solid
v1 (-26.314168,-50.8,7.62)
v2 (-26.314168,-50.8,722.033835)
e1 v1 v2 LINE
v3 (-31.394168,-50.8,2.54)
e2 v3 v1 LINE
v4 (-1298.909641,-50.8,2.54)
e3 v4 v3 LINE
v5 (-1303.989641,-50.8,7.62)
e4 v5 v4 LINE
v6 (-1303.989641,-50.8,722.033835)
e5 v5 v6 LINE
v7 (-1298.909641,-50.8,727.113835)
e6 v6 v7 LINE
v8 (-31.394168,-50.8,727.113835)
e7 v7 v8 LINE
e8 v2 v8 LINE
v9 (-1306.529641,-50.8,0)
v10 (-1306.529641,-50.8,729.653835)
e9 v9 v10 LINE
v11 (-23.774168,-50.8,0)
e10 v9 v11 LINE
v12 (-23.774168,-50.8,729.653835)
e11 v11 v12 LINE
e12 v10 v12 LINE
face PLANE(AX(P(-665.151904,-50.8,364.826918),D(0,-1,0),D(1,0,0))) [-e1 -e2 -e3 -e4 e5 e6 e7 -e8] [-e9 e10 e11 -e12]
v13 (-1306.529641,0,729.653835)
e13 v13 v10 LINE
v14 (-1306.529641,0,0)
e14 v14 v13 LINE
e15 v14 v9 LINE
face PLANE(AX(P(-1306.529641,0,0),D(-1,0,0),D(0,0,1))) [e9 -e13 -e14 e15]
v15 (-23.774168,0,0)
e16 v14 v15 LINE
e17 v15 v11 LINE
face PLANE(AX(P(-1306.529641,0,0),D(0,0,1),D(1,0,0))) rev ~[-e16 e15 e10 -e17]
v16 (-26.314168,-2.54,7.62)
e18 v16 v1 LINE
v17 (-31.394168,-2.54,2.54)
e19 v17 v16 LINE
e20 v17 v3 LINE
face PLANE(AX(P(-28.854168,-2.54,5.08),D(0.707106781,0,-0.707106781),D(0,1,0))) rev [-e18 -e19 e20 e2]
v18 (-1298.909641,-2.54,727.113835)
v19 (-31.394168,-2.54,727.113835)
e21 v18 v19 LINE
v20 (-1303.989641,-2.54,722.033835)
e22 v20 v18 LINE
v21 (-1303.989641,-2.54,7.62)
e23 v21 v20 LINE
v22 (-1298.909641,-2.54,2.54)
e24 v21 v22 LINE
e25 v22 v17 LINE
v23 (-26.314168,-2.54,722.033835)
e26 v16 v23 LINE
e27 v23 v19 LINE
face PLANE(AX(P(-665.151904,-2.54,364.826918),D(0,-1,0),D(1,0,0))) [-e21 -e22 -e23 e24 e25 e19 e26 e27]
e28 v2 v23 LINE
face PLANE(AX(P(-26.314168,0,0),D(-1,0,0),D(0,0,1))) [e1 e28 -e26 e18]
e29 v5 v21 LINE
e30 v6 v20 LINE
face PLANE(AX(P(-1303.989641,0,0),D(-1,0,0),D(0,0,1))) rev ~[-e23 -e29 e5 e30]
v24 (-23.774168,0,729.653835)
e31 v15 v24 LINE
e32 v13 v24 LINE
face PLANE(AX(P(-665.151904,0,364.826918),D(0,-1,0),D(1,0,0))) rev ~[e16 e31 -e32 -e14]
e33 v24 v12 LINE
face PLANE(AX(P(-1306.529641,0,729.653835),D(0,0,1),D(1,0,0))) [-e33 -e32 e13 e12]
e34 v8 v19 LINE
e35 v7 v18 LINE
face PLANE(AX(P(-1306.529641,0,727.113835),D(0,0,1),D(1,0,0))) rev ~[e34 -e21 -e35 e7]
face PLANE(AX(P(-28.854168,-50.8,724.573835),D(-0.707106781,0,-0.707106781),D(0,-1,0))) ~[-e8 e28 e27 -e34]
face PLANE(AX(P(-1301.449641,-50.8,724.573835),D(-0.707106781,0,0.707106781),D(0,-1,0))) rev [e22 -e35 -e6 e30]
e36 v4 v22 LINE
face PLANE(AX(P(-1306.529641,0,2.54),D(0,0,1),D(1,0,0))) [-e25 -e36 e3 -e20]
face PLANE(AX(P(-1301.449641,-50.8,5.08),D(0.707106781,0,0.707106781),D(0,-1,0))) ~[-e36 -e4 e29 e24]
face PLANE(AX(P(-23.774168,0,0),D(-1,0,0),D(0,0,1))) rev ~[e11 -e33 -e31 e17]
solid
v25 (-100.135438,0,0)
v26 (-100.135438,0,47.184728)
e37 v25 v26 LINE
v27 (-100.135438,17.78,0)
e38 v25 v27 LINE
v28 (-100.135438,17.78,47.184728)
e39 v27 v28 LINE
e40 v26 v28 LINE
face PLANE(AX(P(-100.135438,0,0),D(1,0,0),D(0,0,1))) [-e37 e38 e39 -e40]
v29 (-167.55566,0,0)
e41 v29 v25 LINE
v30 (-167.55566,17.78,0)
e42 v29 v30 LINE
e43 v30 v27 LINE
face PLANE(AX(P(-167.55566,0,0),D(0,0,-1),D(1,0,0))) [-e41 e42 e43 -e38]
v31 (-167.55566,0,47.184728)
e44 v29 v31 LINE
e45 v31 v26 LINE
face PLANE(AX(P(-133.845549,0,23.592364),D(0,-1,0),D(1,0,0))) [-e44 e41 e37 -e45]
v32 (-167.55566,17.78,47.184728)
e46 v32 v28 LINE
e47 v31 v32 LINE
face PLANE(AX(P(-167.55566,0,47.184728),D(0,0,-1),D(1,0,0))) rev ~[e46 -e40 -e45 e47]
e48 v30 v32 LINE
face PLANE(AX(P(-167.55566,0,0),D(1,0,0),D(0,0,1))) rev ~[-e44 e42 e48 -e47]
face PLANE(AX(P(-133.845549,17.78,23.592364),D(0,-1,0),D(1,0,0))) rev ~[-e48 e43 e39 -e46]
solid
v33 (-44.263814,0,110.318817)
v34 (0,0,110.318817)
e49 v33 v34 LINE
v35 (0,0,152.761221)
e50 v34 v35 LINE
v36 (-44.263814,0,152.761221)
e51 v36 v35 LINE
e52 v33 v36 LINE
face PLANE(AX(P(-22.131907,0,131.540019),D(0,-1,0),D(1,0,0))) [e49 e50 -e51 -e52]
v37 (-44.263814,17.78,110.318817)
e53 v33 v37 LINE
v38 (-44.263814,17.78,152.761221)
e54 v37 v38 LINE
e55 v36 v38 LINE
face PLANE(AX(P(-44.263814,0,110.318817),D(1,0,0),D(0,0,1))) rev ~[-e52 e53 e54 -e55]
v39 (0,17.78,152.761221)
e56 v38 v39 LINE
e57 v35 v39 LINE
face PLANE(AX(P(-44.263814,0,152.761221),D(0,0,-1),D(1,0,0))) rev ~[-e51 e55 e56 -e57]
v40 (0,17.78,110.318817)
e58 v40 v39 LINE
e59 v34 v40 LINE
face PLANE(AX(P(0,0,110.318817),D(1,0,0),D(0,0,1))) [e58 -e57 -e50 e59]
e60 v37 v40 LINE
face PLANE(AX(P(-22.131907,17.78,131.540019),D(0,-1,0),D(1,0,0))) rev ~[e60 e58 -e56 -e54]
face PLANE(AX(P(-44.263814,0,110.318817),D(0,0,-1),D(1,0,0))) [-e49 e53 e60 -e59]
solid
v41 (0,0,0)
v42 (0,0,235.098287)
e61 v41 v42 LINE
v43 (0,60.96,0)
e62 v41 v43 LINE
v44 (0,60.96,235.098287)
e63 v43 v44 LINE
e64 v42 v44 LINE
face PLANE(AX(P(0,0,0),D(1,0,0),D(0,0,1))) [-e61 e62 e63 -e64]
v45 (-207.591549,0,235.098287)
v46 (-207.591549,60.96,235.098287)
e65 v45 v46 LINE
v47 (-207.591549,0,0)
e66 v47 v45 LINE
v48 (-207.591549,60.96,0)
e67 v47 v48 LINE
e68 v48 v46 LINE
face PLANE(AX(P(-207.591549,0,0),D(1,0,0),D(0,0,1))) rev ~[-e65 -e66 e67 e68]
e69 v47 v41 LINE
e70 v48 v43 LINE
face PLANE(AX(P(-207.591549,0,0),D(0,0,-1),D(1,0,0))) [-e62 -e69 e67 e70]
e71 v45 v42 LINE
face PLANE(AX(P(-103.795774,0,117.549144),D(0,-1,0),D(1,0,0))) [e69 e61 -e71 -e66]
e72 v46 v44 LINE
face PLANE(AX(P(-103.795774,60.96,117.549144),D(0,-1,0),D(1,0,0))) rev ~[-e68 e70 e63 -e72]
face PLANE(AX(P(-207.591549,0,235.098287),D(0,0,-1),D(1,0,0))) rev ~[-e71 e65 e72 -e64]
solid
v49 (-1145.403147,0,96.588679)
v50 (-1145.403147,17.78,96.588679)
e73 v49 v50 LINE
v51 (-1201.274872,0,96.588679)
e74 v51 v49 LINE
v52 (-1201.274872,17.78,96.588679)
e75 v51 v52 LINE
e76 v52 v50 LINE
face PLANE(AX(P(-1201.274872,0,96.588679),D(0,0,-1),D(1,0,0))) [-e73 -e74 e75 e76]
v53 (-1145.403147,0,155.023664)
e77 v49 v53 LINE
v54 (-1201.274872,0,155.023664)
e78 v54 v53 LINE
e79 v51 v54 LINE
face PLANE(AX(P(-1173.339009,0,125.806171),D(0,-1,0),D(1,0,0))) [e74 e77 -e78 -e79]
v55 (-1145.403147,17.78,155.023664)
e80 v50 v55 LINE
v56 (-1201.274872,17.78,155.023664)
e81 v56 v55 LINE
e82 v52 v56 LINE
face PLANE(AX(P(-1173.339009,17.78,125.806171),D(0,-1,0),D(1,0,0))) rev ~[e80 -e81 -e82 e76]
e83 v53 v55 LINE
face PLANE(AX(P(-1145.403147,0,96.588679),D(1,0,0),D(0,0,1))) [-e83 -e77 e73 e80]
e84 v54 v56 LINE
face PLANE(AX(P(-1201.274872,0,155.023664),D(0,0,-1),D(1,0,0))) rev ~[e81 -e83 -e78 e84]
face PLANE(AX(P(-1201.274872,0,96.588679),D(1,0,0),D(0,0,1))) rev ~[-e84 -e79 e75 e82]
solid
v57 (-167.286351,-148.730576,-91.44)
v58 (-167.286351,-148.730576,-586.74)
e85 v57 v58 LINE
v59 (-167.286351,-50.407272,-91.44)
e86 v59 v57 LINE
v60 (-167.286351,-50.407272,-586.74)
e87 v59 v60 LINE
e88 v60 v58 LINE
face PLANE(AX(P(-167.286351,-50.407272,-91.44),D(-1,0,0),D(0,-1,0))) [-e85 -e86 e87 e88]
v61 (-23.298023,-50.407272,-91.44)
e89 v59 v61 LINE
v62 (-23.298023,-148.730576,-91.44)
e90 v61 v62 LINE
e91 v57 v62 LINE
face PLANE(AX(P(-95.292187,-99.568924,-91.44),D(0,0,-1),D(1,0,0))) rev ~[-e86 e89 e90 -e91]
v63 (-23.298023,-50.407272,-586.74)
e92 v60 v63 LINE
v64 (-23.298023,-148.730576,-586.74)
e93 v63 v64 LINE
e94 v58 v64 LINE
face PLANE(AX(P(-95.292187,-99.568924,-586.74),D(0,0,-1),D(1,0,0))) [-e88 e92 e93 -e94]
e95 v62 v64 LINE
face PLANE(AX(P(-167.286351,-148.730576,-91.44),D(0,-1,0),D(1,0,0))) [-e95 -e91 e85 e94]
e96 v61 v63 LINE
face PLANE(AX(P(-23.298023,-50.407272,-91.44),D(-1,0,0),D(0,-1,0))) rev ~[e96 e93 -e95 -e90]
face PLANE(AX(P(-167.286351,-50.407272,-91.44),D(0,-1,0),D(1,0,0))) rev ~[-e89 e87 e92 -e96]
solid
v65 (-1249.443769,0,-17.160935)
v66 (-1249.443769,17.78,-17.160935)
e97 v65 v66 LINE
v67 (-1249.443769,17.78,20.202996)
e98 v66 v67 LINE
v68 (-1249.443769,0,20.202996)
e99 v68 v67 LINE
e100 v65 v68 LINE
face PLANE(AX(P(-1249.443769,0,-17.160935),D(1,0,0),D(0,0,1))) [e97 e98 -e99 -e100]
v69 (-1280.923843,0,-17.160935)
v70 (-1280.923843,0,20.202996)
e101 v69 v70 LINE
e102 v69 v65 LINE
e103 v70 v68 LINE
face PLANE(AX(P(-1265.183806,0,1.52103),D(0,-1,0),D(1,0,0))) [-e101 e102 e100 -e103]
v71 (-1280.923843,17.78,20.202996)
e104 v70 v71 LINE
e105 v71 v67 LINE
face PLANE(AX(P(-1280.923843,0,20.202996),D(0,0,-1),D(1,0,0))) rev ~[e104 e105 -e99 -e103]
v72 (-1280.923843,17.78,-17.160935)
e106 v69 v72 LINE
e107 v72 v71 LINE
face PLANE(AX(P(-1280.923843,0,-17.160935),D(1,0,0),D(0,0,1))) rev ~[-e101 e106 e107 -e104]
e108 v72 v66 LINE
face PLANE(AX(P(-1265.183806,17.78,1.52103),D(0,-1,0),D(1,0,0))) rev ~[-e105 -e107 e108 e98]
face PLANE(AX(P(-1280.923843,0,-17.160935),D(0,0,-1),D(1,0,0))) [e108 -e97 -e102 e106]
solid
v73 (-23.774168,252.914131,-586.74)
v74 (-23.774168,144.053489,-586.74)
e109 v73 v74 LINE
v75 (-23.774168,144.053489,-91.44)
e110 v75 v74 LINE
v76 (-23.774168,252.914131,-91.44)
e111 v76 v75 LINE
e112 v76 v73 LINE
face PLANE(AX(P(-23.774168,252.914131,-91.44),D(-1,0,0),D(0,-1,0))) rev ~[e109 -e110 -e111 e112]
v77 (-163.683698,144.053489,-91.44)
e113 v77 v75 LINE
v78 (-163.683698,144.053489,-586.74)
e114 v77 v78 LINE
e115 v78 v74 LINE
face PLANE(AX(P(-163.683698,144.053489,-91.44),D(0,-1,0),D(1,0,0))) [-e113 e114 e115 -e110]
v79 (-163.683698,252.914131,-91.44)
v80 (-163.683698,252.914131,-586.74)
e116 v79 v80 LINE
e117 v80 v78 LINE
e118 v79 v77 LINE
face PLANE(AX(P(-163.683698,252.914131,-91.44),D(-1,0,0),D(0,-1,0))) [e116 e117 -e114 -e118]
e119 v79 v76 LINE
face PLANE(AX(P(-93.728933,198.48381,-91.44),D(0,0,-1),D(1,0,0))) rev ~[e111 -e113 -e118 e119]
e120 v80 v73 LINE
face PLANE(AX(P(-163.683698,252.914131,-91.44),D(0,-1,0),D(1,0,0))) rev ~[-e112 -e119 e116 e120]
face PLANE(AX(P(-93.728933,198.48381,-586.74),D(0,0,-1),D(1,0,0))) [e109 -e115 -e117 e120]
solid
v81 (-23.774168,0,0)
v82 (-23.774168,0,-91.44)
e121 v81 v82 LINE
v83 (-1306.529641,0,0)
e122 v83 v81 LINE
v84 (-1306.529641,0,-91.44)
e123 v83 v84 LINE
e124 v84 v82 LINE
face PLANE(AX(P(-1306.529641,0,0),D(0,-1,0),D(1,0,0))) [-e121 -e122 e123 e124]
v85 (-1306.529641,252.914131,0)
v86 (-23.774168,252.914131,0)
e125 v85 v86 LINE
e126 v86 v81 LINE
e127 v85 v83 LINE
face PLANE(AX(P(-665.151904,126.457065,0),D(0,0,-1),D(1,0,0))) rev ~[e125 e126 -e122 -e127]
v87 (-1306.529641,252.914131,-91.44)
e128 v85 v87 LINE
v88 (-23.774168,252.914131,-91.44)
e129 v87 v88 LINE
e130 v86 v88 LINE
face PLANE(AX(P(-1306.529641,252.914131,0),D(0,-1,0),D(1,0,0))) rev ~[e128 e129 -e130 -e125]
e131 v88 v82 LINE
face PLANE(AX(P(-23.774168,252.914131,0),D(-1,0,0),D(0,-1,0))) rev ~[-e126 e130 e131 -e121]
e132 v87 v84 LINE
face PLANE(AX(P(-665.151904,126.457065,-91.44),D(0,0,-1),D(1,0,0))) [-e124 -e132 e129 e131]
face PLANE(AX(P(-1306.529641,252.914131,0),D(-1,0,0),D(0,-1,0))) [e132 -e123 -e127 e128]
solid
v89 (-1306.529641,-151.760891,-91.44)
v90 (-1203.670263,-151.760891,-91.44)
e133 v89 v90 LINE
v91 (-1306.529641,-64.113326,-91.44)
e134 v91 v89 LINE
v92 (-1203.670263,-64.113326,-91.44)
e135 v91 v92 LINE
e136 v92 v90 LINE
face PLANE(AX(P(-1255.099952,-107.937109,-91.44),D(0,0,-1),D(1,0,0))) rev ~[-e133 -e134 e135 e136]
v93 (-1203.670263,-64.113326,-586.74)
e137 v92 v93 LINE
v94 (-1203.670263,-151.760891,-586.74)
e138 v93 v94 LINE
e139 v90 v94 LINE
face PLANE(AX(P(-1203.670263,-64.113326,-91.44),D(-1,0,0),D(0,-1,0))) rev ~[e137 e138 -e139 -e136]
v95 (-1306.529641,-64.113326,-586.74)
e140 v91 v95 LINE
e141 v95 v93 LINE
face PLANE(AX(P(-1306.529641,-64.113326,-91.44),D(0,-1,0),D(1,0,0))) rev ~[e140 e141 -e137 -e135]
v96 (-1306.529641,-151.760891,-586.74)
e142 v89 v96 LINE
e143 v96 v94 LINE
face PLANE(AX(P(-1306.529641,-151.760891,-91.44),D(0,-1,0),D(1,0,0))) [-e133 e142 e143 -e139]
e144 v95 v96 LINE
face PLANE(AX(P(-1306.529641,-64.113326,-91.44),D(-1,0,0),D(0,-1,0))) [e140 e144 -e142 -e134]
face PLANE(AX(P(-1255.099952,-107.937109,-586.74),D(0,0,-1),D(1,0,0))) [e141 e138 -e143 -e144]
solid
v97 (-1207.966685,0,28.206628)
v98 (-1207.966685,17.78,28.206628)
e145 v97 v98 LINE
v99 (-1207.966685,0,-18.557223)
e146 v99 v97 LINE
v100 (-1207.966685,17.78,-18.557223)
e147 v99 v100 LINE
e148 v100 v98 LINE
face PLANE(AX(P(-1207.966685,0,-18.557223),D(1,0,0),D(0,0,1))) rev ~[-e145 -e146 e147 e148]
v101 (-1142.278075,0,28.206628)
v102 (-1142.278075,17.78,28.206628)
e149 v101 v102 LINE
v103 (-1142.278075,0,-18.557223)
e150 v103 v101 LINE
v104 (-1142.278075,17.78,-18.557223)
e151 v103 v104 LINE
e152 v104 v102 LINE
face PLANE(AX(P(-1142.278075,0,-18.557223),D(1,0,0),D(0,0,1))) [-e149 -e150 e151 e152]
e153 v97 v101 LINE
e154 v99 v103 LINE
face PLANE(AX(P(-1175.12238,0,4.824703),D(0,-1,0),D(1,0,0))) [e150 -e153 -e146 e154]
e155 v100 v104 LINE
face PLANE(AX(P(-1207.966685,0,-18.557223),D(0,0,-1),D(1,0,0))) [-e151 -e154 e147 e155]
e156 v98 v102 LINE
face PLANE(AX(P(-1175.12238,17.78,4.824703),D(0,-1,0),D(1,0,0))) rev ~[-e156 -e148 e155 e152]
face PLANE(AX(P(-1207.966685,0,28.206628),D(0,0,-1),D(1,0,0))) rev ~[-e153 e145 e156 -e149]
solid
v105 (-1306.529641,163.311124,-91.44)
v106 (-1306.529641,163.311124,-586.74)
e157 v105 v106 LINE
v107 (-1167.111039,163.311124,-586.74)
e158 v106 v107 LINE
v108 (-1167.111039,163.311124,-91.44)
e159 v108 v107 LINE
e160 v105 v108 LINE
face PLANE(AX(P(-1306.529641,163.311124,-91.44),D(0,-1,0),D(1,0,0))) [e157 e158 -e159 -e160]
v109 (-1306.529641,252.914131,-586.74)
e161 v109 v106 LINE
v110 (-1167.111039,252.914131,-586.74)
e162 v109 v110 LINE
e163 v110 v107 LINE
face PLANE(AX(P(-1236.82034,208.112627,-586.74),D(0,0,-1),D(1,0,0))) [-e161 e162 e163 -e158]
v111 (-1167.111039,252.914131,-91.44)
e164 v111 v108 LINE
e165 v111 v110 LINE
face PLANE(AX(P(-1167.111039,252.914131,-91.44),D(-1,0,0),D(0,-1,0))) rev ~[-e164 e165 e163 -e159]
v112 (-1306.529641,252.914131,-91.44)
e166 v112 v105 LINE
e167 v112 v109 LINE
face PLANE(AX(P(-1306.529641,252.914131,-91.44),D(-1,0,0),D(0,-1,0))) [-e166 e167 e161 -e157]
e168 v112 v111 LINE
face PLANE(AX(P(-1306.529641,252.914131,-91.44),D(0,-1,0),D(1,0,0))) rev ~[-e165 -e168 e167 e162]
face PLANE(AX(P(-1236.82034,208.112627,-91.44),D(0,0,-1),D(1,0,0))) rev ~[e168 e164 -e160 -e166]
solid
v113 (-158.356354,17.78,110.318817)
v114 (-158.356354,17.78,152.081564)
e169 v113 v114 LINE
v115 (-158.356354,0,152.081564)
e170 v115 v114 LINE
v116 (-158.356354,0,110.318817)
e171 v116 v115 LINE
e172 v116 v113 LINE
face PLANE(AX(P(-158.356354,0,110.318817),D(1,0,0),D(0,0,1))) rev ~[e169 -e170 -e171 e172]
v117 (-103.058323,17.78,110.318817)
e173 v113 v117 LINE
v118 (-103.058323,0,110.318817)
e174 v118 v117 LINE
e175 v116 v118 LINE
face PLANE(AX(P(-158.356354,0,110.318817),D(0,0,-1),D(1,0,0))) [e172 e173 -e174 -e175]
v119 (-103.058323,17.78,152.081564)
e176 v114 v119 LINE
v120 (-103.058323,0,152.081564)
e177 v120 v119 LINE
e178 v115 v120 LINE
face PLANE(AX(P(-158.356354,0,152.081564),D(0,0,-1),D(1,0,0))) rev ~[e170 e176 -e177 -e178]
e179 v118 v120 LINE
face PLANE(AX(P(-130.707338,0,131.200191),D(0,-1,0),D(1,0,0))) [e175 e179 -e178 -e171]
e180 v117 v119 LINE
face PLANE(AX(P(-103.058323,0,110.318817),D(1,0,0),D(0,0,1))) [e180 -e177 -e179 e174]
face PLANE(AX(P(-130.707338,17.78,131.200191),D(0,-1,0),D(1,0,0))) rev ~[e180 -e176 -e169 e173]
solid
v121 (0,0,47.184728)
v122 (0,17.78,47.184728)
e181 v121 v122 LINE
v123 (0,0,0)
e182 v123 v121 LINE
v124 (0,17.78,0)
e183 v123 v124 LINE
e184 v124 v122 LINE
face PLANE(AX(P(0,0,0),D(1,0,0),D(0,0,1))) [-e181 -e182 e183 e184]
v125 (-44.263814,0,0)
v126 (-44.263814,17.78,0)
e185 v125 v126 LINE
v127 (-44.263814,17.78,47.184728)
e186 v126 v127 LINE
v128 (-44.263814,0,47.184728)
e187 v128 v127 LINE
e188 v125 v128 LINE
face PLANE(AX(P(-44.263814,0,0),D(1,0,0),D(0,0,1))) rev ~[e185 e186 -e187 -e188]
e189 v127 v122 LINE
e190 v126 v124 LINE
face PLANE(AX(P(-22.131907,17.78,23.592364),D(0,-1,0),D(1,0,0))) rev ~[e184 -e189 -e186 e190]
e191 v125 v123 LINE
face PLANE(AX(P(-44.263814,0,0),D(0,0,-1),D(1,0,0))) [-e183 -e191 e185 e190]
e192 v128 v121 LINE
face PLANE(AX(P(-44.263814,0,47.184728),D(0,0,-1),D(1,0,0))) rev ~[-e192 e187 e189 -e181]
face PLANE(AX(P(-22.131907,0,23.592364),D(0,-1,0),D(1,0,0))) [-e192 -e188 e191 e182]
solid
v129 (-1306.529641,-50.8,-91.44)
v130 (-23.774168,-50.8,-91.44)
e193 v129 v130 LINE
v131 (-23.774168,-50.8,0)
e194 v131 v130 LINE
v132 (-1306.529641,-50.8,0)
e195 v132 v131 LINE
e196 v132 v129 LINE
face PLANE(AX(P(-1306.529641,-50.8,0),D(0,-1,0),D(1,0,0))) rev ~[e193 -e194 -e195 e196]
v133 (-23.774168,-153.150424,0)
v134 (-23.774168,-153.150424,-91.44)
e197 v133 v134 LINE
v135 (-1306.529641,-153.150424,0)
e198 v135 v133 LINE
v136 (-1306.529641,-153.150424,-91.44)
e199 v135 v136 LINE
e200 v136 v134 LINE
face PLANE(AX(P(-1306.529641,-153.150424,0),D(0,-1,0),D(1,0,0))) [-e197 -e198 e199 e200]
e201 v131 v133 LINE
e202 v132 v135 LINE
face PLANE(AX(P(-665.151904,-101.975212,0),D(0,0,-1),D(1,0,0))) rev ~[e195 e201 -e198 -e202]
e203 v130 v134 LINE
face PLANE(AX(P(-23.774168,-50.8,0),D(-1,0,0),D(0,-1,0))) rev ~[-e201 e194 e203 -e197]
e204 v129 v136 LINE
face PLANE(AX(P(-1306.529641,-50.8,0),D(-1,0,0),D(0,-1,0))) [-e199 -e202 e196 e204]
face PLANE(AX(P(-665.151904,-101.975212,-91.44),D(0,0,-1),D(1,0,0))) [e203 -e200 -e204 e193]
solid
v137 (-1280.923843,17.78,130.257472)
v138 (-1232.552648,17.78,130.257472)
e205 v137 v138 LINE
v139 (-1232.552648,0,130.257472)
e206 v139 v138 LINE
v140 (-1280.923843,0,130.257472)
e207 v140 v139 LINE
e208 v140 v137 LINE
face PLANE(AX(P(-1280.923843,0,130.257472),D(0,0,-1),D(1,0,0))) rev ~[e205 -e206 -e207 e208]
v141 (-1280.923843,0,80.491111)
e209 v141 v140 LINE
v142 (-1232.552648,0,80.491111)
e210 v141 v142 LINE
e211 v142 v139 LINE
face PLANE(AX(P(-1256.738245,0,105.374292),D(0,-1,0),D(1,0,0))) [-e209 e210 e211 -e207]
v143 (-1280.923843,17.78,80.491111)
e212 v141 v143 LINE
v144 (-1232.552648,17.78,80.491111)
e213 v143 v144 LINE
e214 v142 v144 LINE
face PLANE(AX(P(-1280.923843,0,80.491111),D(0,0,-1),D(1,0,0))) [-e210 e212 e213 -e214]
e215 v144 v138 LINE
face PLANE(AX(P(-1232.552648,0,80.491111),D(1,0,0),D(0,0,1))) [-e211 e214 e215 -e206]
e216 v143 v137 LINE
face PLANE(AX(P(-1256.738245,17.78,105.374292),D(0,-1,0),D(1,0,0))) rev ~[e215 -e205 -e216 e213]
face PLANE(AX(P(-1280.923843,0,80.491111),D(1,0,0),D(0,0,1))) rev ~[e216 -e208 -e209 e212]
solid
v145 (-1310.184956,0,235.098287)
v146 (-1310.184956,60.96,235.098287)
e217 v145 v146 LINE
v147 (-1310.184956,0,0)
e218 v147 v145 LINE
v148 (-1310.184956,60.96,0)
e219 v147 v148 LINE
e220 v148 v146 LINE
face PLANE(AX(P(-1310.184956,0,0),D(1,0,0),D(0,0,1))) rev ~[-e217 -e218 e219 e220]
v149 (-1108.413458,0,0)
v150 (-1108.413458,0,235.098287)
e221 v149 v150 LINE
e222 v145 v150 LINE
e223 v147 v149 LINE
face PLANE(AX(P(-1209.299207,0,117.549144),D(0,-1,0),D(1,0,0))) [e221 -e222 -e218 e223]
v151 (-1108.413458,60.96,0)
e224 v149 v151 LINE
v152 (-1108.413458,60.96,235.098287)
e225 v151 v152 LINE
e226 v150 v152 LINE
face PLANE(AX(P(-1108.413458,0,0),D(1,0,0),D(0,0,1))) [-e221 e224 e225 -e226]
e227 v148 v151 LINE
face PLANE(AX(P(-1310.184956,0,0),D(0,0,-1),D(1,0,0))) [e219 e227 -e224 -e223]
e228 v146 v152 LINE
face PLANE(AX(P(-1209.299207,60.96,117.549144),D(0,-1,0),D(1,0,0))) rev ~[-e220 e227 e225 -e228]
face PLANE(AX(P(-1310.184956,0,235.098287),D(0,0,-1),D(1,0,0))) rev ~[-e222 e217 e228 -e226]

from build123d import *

# Parameters (mm, degrees)
F0_W      = 1282.7554736286
F0_H      = 729.6538352966
F1_DEPTH  = 50.8
F2_T      = -2.54
F3_SIZE   = 5.08
F4_W      = 1282.7554736286
F4_H      = 252.9141306877
F5_DEPTH  = 91.44
F4_H_2    = 102.3504243612
F6_W      = 102.859377861
F6_H      = 87.6475647092
F7_DEPTH  = 495.3
F6_W_2    = 139.9095300585
F6_H_2    = 108.8606417179
F6_W_3    = 139.4186019897
F6_H_3    = 89.6030068398
F6_W_4    = 143.9883280545
F6_H_4    = 98.3233042061
F8_W      = 207.591548562
F8_H      = 235.0982874632
F9_DEPTH  = 60.96
F8_W_2    = 201.7714977264
F10_W     = 44.2638136446
F10_H     = 42.4424037337
F11_DEPTH = 17.78
F10_W_2   = 55.2980303764
F10_H_2   = 41.7627468705
F10_H_3   = 47.184728086
F10_W_3   = 67.4202218652
F10_W_4   = 55.8717250824
F10_H_4   = 58.4349855781
F10_W_5   = 48.3711957932
F10_H_5   = 49.7663617134
F10_W_6   = 65.6886100769
F10_H_6   = 46.763850376
F10_W_7   = 31.4800739288
F10_H_7   = 37.3639315367


with BuildPart() as f1:
    # F0 (on Front) → F1 (new body)
    with BuildSketch(Plane.XZ):
        with Locations((-665.1519043371, 364.8269176483)):
            Rectangle(F0_W, F0_H)
    extrude(amount=F1_DEPTH)

    # F2
    f2_openings = [f1.faces().sort_by_distance(p)[0] for p in [
        (-665.151904, -50.8, 364.826918),
    ]]
    offset(amount=F2_T, openings=f2_openings)

    # F3
    f3_edges = [f1.edges().sort_by_distance(p)[0] for p in [
        (-1303.989641, -26.67, 727.113835),
        (-26.314168, -26.67, 727.113835),
        (-1303.989641, -26.67, 2.54),
        (-26.314168, -26.67, 2.54),
    ]]
    chamfer(f3_edges, length=F3_SIZE)


with BuildPart() as f5:
    # F4 (on face) → F5 (new body)
    with BuildSketch(Plane(origin=(0, 0, 0), x_dir=(1, 0, 0), z_dir=(0, 0, -1))):
        with Locations((-665.1519043371, -126.4570653439)):
            Rectangle(F4_W, F4_H)
    extrude(amount=F5_DEPTH)


with BuildPart() as f5b:
    # F4 (on face) → F5, piece 2 (new body)
    with BuildSketch(Plane(origin=(0, 0, 0), x_dir=(1, 0, 0), z_dir=(0, 0, -1))):
        with Locations((-665.1519043371, 101.9752121806)):
            Rectangle(F4_W, F4_H_2)
    extrude(amount=F5_DEPTH)


with BuildPart() as f7:
    # F6 (on face) → F7 (new body)
    with BuildSketch(Plane(origin=(0, 0, -91.44), x_dir=(1, 0, 0), z_dir=(0, 0, -1))):
        with Locations((-1255.0999522209, 107.9371087253)):
            Rectangle(F6_W, F6_H)
    extrude(amount=F7_DEPTH)


with BuildPart() as f7b:
    # F6 (on face) → F7, piece 2 (new body)
    with BuildSketch(Plane(origin=(0, 0, -91.44), x_dir=(1, 0, 0), z_dir=(0, 0, -1))):
        with Locations((-93.728932552, -198.4838098288)):
            Rectangle(F6_W_2, F6_H_2)
    extrude(amount=F7_DEPTH)


with BuildPart() as f7c:
    # F6 (on face) → F7, piece 3 (new body)
    with BuildSketch(Plane(origin=(0, 0, -91.44), x_dir=(1, 0, 0), z_dir=(0, 0, -1))):
        with Locations((-1236.8203401566, -208.1126272678)):
            Rectangle(F6_W_3, F6_H_3)
    extrude(amount=F7_DEPTH)


with BuildPart() as f7d:
    # F6 (on face) → F7, piece 4 (new body)
    with BuildSketch(Plane(origin=(0, 0, -91.44), x_dir=(1, 0, 0), z_dir=(0, 0, -1))):
        with Locations((-95.2921872959, 99.5689239353)):
            Rectangle(F6_W_4, F6_H_4)
    extrude(amount=F7_DEPTH)


with BuildPart() as f9:
    # F8 (on Front) → F9 (new body)
    with BuildSketch(Plane.XZ):
        with Locations((-103.795774281, 117.5491437316)):
            Rectangle(F8_W, F8_H)
    extrude(amount=-F9_DEPTH)


with BuildPart() as f9b:
    # F8 (on Front) → F9, piece 2 (new body)
    with BuildSketch(Plane.XZ):
        with Locations((-1209.2992067337, 117.5491437316)):
            Rectangle(F8_W_2, F8_H)
    extrude(amount=-F9_DEPTH)


with BuildPart() as f11:
    # F10 (on Front) → F11 (new body)
    with BuildSketch(Plane.XZ):
        with Locations((-22.1319068223, 131.5400190651)):
            Rectangle(F10_W, F10_H)
    extrude(amount=-F11_DEPTH)


with BuildPart() as f11b:
    # F10 (on Front) → F11, piece 2 (new body)
    with BuildSketch(Plane.XZ):
        with Locations((-130.7073384523, 131.2001906335)):
            Rectangle(F10_W_2, F10_H_2)
    extrude(amount=-F11_DEPTH)


with BuildPart() as f11c:
    # F10 (on Front) → F11, piece 3 (new body)
    with BuildSketch(Plane.XZ):
        with Locations((-22.1319068223, 23.592364043)):
            Rectangle(F10_W, F10_H_3)
    extrude(amount=-F11_DEPTH)


with BuildPart() as f11d:
    # F10 (on Front) → F11, piece 4 (new body)
    with BuildSketch(Plane.XZ):
        with Locations((-133.8455490768, 23.592364043)):
            Rectangle(F10_W_3, F10_H_3)
    extrude(amount=-F11_DEPTH)


with BuildPart() as f11e:
    # F10 (on Front) → F11, piece 5 (new body)
    with BuildSketch(Plane.XZ):
        with Locations((-1173.339009285, 125.806171447)):
            Rectangle(F10_W_4, F10_H_4)
    extrude(amount=-F11_DEPTH)


with BuildPart() as f11f:
    # F10 (on Front) → F11, piece 6 (new body)
    with BuildSketch(Plane.XZ):
        with Locations((-1256.7382454872, 105.3742915392)):
            Rectangle(F10_W_5, F10_H_5)
    extrude(amount=-F11_DEPTH)


with BuildPart() as f11g:
    # F10 (on Front) → F11, piece 7 (new body)
    with BuildSketch(Plane.XZ):
        with Locations((-1175.1223802567, 4.824702628)):
            Rectangle(F10_W_6, F10_H_6)
    extrude(amount=-F11_DEPTH)


with BuildPart() as f11h:
    # F10 (on Front) → F11, piece 8 (new body)
    with BuildSketch(Plane.XZ):
        with Locations((-1265.1838064194, 1.5210304409)):
            Rectangle(F10_W_7, F10_H_7)
    extrude(amount=-F11_DEPTH)


solid = Compound([f1.part, f5.part, f5b.part, f7.part, f7b.part, f7c.part, f7d.part, f9.part, f9b.part, f11.part, f11b.part, f11c.part, f11d.part, f11e.part, f11f.part, f11g.part, f11h.part])
